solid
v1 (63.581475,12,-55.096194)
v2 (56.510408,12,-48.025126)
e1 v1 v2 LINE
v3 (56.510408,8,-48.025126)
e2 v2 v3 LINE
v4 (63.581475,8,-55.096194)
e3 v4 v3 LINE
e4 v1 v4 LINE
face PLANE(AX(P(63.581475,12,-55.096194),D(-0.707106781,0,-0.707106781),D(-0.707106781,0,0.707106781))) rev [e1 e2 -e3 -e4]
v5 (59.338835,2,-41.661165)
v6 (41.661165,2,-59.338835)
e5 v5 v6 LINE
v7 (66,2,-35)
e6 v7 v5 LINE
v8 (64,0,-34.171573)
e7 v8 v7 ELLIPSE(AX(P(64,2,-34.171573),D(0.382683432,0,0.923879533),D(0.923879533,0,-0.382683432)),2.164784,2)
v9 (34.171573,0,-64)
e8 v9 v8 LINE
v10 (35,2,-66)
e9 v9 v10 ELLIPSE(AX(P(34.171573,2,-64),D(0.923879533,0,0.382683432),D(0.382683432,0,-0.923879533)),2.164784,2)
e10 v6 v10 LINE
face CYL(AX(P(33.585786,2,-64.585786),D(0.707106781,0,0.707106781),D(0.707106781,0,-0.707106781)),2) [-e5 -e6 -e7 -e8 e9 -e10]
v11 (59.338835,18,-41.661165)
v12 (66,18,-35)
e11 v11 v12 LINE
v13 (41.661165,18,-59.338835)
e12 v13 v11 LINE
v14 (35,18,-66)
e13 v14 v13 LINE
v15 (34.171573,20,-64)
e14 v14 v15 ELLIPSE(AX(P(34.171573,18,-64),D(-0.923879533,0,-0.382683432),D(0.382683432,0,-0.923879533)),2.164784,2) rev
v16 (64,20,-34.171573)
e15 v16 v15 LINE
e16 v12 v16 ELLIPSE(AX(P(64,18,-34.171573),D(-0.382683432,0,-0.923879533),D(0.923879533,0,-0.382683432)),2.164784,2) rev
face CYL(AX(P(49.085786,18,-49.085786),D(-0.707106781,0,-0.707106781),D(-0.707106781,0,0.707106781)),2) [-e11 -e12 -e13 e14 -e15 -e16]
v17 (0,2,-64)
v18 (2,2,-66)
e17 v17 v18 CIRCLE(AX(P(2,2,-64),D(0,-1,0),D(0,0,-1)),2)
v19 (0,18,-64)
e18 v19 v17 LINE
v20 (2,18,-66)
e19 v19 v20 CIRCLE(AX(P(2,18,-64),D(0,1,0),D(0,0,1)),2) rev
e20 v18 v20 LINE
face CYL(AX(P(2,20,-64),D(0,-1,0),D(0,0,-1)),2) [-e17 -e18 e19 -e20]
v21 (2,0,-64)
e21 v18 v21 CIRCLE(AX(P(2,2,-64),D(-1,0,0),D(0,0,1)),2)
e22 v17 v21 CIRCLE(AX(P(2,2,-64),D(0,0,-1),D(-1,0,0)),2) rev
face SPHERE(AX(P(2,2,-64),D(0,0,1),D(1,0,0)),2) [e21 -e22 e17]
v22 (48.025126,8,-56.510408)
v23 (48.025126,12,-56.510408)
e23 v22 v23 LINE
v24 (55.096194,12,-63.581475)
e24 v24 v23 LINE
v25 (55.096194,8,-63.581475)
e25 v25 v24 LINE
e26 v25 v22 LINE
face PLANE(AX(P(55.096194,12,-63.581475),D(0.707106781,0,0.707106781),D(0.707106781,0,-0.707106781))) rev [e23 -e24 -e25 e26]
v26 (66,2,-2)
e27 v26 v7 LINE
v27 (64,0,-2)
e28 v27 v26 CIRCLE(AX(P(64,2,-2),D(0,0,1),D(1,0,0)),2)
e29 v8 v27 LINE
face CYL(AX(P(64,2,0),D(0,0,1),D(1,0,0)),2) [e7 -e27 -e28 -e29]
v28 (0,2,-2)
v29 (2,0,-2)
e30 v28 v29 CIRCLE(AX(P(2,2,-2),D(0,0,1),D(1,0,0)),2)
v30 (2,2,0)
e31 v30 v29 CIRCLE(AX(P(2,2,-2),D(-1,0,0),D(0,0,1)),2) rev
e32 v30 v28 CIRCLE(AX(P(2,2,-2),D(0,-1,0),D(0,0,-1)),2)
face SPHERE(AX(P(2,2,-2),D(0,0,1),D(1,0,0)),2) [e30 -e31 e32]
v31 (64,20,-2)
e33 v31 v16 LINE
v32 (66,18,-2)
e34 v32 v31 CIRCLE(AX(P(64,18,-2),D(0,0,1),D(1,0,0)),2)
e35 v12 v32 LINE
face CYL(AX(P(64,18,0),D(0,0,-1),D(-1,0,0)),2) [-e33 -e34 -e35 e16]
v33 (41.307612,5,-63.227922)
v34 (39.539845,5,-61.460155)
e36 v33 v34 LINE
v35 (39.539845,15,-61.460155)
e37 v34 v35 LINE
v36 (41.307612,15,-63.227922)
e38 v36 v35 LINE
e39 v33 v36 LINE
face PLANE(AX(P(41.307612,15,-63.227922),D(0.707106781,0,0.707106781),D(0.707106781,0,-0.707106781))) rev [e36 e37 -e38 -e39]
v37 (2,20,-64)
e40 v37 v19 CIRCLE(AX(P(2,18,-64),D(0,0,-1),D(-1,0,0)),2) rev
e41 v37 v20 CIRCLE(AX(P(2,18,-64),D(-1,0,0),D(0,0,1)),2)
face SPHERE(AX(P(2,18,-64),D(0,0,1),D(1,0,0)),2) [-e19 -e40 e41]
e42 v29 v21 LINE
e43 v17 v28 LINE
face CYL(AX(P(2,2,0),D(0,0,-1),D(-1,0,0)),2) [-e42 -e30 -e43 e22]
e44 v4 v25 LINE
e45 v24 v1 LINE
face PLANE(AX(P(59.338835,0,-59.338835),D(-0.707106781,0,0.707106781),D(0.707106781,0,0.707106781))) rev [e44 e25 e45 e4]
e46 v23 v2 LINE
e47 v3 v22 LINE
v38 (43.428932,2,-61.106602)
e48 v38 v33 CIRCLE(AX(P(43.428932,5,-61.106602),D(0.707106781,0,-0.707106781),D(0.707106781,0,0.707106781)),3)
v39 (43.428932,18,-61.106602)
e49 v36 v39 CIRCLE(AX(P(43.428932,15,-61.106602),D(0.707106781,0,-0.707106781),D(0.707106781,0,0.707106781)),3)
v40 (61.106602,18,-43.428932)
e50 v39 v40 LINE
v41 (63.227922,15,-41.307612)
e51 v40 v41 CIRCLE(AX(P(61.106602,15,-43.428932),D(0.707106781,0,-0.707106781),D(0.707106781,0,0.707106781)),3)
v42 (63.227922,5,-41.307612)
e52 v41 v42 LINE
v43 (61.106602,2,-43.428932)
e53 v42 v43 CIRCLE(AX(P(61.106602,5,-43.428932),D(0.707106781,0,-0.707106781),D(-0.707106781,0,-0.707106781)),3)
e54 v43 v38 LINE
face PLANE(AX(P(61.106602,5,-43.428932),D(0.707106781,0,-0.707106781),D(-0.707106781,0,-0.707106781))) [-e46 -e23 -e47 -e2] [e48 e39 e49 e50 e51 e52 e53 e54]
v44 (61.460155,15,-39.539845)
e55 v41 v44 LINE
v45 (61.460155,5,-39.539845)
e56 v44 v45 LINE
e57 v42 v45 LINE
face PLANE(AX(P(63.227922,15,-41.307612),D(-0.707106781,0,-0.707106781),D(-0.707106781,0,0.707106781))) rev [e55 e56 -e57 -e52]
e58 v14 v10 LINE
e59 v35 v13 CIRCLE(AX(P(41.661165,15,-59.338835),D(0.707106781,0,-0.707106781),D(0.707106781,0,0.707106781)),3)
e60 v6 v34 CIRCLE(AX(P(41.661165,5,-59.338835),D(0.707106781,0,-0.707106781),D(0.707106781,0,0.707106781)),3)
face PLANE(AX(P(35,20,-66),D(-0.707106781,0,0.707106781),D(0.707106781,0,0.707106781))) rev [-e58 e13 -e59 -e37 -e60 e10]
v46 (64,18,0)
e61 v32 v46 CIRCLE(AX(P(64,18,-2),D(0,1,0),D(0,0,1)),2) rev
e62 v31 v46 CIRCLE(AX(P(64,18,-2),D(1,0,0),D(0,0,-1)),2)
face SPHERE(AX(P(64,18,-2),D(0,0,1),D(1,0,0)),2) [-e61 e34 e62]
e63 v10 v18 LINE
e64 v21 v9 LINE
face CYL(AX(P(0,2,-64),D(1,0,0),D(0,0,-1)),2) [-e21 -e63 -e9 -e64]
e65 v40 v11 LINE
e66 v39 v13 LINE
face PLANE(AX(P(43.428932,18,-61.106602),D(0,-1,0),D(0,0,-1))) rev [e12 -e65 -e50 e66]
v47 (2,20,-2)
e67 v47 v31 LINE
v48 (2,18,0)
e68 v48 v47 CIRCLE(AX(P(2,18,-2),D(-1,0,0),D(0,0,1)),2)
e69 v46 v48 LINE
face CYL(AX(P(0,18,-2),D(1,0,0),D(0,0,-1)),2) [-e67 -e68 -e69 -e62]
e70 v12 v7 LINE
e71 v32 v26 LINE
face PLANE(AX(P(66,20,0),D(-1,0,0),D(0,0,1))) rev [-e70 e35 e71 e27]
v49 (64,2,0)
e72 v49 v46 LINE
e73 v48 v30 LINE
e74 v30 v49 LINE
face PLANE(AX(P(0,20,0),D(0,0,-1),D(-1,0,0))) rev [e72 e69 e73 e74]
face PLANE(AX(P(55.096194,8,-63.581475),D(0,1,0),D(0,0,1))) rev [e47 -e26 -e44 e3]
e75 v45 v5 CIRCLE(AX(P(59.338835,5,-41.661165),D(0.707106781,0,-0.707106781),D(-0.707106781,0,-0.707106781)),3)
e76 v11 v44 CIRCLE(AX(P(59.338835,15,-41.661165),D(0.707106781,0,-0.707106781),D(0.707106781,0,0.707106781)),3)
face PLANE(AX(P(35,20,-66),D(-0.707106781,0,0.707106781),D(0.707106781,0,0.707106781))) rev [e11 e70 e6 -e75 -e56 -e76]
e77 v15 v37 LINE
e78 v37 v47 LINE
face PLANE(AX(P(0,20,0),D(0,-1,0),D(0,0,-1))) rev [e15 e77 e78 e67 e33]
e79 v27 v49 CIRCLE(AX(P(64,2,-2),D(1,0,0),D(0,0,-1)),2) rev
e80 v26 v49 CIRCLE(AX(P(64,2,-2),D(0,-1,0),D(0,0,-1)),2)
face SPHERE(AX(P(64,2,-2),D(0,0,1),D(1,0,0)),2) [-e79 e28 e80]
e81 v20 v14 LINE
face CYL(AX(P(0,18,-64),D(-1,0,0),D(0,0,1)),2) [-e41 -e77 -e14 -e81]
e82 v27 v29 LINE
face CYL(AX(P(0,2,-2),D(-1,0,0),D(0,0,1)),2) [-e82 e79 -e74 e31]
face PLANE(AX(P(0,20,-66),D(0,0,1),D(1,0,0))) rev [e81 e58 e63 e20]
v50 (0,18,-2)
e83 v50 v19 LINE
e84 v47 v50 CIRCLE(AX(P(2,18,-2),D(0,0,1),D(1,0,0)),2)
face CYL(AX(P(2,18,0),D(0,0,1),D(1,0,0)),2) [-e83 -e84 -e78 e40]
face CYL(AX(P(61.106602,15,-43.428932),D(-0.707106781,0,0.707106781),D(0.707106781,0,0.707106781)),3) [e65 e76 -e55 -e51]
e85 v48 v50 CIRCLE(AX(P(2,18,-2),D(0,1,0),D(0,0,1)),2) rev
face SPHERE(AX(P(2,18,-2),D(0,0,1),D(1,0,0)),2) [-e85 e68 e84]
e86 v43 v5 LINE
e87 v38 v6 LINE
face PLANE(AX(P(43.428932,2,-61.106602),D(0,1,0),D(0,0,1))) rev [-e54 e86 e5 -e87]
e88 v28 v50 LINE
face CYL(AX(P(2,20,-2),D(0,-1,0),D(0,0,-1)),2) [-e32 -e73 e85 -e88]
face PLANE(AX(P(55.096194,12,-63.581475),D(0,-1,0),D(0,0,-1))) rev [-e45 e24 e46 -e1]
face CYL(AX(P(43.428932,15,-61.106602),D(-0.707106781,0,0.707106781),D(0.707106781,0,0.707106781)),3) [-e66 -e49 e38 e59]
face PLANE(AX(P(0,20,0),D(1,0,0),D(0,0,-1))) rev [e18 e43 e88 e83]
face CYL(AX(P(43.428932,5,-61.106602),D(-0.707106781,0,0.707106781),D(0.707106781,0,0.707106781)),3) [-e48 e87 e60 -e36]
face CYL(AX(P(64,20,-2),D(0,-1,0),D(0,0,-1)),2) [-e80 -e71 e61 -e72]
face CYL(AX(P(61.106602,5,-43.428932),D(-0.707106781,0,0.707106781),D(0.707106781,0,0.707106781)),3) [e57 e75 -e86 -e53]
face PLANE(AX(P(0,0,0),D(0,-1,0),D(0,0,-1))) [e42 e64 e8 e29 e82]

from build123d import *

# Parameters (mm, degrees)
EXTRUDE_1_DEPTH = 20
EXTRUDE_2_DEPTH = 2.5
SKETCH_3_W      = 12
SKETCH_3_H      = 4
EXTRUDE_3_DEPTH = 10
FILLET_1_R      = 2


with BuildPart() as part:
    # 草图1 → 凸台-拉伸1 (new body)
    with BuildSketch(Plane(origin=(0, 0, 0), x_dir=(1, 0, 0), z_dir=(0, 1, 0))):
        Polygon((35, 66), (66, 35), (66, 0), (0, 0), (0, 66), align=None)
    extrude(amount=EXTRUDE_1_DEPTH)

    # 草图2 → 凸台-拉伸2 (add)
    with BuildSketch(Plane(origin=(50.5, 0, -50.5), x_dir=(-0.7071067811865475, 0, -0.7071067811865477), z_dir=(0.7071067811865477, 0, -0.7071067811865475))):
        with BuildLine():
            Line((15.5, 15), (15.5, 5))
            ThreePointArc((15.5, 5), (14.621320344, 2.878679656), (12.5, 2))
            Line((12.5, 2), (-12.5, 2))
            ThreePointArc((-12.5, 2), (-14.621320344, 2.878679656), (-15.5, 5))
            Line((-15.5, 5), (-15.5, 15))
            ThreePointArc((-15.5, 15), (-14.621320344, 17.121320344), (-12.5, 18))
            Line((-12.5, 18), (12.5, 18))
            ThreePointArc((12.5, 18), (14.621320344, 17.121320344), (15.5, 15))
        make_face()
    extrude(amount=EXTRUDE_2_DEPTH)

    # 草图3 → 凸台-拉伸3 (add)
    with BuildSketch(Plane(origin=(52.267766953, 0, -52.267766953), x_dir=(-0.7071067811865476, 0, -0.7071067811865476), z_dir=(0.7071067811865476, 0, -0.7071067811865476))):
        with Locations((0, 10)):
            Rectangle(SKETCH_3_W, SKETCH_3_H)
    extrude(amount=EXTRUDE_3_DEPTH)

    # 圆角1
    fillet_1_edges = [part.edges().sort_by_distance(p)[0] for p in [
        (66, 20, -17.5),
        (50.5, 20, -50.5),
        (17.5, 20, -66),
        (0, 20, -33),
        (17.5, 0, -66),
        (50.5, 0, -50.5),
        (66, 0, -17.5),
        (33, 0, 0),
        (0, 0, -33),
        (33, 20, 0),
        (0, 10, -66),
        (66, 10, 0),
        (0, 10, 0),
    ]]
    fillet(fillet_1_edges, radius=FILLET_1_R - 0.0001)  # a hair under: the kernel refuses the full size


solid = part.part
